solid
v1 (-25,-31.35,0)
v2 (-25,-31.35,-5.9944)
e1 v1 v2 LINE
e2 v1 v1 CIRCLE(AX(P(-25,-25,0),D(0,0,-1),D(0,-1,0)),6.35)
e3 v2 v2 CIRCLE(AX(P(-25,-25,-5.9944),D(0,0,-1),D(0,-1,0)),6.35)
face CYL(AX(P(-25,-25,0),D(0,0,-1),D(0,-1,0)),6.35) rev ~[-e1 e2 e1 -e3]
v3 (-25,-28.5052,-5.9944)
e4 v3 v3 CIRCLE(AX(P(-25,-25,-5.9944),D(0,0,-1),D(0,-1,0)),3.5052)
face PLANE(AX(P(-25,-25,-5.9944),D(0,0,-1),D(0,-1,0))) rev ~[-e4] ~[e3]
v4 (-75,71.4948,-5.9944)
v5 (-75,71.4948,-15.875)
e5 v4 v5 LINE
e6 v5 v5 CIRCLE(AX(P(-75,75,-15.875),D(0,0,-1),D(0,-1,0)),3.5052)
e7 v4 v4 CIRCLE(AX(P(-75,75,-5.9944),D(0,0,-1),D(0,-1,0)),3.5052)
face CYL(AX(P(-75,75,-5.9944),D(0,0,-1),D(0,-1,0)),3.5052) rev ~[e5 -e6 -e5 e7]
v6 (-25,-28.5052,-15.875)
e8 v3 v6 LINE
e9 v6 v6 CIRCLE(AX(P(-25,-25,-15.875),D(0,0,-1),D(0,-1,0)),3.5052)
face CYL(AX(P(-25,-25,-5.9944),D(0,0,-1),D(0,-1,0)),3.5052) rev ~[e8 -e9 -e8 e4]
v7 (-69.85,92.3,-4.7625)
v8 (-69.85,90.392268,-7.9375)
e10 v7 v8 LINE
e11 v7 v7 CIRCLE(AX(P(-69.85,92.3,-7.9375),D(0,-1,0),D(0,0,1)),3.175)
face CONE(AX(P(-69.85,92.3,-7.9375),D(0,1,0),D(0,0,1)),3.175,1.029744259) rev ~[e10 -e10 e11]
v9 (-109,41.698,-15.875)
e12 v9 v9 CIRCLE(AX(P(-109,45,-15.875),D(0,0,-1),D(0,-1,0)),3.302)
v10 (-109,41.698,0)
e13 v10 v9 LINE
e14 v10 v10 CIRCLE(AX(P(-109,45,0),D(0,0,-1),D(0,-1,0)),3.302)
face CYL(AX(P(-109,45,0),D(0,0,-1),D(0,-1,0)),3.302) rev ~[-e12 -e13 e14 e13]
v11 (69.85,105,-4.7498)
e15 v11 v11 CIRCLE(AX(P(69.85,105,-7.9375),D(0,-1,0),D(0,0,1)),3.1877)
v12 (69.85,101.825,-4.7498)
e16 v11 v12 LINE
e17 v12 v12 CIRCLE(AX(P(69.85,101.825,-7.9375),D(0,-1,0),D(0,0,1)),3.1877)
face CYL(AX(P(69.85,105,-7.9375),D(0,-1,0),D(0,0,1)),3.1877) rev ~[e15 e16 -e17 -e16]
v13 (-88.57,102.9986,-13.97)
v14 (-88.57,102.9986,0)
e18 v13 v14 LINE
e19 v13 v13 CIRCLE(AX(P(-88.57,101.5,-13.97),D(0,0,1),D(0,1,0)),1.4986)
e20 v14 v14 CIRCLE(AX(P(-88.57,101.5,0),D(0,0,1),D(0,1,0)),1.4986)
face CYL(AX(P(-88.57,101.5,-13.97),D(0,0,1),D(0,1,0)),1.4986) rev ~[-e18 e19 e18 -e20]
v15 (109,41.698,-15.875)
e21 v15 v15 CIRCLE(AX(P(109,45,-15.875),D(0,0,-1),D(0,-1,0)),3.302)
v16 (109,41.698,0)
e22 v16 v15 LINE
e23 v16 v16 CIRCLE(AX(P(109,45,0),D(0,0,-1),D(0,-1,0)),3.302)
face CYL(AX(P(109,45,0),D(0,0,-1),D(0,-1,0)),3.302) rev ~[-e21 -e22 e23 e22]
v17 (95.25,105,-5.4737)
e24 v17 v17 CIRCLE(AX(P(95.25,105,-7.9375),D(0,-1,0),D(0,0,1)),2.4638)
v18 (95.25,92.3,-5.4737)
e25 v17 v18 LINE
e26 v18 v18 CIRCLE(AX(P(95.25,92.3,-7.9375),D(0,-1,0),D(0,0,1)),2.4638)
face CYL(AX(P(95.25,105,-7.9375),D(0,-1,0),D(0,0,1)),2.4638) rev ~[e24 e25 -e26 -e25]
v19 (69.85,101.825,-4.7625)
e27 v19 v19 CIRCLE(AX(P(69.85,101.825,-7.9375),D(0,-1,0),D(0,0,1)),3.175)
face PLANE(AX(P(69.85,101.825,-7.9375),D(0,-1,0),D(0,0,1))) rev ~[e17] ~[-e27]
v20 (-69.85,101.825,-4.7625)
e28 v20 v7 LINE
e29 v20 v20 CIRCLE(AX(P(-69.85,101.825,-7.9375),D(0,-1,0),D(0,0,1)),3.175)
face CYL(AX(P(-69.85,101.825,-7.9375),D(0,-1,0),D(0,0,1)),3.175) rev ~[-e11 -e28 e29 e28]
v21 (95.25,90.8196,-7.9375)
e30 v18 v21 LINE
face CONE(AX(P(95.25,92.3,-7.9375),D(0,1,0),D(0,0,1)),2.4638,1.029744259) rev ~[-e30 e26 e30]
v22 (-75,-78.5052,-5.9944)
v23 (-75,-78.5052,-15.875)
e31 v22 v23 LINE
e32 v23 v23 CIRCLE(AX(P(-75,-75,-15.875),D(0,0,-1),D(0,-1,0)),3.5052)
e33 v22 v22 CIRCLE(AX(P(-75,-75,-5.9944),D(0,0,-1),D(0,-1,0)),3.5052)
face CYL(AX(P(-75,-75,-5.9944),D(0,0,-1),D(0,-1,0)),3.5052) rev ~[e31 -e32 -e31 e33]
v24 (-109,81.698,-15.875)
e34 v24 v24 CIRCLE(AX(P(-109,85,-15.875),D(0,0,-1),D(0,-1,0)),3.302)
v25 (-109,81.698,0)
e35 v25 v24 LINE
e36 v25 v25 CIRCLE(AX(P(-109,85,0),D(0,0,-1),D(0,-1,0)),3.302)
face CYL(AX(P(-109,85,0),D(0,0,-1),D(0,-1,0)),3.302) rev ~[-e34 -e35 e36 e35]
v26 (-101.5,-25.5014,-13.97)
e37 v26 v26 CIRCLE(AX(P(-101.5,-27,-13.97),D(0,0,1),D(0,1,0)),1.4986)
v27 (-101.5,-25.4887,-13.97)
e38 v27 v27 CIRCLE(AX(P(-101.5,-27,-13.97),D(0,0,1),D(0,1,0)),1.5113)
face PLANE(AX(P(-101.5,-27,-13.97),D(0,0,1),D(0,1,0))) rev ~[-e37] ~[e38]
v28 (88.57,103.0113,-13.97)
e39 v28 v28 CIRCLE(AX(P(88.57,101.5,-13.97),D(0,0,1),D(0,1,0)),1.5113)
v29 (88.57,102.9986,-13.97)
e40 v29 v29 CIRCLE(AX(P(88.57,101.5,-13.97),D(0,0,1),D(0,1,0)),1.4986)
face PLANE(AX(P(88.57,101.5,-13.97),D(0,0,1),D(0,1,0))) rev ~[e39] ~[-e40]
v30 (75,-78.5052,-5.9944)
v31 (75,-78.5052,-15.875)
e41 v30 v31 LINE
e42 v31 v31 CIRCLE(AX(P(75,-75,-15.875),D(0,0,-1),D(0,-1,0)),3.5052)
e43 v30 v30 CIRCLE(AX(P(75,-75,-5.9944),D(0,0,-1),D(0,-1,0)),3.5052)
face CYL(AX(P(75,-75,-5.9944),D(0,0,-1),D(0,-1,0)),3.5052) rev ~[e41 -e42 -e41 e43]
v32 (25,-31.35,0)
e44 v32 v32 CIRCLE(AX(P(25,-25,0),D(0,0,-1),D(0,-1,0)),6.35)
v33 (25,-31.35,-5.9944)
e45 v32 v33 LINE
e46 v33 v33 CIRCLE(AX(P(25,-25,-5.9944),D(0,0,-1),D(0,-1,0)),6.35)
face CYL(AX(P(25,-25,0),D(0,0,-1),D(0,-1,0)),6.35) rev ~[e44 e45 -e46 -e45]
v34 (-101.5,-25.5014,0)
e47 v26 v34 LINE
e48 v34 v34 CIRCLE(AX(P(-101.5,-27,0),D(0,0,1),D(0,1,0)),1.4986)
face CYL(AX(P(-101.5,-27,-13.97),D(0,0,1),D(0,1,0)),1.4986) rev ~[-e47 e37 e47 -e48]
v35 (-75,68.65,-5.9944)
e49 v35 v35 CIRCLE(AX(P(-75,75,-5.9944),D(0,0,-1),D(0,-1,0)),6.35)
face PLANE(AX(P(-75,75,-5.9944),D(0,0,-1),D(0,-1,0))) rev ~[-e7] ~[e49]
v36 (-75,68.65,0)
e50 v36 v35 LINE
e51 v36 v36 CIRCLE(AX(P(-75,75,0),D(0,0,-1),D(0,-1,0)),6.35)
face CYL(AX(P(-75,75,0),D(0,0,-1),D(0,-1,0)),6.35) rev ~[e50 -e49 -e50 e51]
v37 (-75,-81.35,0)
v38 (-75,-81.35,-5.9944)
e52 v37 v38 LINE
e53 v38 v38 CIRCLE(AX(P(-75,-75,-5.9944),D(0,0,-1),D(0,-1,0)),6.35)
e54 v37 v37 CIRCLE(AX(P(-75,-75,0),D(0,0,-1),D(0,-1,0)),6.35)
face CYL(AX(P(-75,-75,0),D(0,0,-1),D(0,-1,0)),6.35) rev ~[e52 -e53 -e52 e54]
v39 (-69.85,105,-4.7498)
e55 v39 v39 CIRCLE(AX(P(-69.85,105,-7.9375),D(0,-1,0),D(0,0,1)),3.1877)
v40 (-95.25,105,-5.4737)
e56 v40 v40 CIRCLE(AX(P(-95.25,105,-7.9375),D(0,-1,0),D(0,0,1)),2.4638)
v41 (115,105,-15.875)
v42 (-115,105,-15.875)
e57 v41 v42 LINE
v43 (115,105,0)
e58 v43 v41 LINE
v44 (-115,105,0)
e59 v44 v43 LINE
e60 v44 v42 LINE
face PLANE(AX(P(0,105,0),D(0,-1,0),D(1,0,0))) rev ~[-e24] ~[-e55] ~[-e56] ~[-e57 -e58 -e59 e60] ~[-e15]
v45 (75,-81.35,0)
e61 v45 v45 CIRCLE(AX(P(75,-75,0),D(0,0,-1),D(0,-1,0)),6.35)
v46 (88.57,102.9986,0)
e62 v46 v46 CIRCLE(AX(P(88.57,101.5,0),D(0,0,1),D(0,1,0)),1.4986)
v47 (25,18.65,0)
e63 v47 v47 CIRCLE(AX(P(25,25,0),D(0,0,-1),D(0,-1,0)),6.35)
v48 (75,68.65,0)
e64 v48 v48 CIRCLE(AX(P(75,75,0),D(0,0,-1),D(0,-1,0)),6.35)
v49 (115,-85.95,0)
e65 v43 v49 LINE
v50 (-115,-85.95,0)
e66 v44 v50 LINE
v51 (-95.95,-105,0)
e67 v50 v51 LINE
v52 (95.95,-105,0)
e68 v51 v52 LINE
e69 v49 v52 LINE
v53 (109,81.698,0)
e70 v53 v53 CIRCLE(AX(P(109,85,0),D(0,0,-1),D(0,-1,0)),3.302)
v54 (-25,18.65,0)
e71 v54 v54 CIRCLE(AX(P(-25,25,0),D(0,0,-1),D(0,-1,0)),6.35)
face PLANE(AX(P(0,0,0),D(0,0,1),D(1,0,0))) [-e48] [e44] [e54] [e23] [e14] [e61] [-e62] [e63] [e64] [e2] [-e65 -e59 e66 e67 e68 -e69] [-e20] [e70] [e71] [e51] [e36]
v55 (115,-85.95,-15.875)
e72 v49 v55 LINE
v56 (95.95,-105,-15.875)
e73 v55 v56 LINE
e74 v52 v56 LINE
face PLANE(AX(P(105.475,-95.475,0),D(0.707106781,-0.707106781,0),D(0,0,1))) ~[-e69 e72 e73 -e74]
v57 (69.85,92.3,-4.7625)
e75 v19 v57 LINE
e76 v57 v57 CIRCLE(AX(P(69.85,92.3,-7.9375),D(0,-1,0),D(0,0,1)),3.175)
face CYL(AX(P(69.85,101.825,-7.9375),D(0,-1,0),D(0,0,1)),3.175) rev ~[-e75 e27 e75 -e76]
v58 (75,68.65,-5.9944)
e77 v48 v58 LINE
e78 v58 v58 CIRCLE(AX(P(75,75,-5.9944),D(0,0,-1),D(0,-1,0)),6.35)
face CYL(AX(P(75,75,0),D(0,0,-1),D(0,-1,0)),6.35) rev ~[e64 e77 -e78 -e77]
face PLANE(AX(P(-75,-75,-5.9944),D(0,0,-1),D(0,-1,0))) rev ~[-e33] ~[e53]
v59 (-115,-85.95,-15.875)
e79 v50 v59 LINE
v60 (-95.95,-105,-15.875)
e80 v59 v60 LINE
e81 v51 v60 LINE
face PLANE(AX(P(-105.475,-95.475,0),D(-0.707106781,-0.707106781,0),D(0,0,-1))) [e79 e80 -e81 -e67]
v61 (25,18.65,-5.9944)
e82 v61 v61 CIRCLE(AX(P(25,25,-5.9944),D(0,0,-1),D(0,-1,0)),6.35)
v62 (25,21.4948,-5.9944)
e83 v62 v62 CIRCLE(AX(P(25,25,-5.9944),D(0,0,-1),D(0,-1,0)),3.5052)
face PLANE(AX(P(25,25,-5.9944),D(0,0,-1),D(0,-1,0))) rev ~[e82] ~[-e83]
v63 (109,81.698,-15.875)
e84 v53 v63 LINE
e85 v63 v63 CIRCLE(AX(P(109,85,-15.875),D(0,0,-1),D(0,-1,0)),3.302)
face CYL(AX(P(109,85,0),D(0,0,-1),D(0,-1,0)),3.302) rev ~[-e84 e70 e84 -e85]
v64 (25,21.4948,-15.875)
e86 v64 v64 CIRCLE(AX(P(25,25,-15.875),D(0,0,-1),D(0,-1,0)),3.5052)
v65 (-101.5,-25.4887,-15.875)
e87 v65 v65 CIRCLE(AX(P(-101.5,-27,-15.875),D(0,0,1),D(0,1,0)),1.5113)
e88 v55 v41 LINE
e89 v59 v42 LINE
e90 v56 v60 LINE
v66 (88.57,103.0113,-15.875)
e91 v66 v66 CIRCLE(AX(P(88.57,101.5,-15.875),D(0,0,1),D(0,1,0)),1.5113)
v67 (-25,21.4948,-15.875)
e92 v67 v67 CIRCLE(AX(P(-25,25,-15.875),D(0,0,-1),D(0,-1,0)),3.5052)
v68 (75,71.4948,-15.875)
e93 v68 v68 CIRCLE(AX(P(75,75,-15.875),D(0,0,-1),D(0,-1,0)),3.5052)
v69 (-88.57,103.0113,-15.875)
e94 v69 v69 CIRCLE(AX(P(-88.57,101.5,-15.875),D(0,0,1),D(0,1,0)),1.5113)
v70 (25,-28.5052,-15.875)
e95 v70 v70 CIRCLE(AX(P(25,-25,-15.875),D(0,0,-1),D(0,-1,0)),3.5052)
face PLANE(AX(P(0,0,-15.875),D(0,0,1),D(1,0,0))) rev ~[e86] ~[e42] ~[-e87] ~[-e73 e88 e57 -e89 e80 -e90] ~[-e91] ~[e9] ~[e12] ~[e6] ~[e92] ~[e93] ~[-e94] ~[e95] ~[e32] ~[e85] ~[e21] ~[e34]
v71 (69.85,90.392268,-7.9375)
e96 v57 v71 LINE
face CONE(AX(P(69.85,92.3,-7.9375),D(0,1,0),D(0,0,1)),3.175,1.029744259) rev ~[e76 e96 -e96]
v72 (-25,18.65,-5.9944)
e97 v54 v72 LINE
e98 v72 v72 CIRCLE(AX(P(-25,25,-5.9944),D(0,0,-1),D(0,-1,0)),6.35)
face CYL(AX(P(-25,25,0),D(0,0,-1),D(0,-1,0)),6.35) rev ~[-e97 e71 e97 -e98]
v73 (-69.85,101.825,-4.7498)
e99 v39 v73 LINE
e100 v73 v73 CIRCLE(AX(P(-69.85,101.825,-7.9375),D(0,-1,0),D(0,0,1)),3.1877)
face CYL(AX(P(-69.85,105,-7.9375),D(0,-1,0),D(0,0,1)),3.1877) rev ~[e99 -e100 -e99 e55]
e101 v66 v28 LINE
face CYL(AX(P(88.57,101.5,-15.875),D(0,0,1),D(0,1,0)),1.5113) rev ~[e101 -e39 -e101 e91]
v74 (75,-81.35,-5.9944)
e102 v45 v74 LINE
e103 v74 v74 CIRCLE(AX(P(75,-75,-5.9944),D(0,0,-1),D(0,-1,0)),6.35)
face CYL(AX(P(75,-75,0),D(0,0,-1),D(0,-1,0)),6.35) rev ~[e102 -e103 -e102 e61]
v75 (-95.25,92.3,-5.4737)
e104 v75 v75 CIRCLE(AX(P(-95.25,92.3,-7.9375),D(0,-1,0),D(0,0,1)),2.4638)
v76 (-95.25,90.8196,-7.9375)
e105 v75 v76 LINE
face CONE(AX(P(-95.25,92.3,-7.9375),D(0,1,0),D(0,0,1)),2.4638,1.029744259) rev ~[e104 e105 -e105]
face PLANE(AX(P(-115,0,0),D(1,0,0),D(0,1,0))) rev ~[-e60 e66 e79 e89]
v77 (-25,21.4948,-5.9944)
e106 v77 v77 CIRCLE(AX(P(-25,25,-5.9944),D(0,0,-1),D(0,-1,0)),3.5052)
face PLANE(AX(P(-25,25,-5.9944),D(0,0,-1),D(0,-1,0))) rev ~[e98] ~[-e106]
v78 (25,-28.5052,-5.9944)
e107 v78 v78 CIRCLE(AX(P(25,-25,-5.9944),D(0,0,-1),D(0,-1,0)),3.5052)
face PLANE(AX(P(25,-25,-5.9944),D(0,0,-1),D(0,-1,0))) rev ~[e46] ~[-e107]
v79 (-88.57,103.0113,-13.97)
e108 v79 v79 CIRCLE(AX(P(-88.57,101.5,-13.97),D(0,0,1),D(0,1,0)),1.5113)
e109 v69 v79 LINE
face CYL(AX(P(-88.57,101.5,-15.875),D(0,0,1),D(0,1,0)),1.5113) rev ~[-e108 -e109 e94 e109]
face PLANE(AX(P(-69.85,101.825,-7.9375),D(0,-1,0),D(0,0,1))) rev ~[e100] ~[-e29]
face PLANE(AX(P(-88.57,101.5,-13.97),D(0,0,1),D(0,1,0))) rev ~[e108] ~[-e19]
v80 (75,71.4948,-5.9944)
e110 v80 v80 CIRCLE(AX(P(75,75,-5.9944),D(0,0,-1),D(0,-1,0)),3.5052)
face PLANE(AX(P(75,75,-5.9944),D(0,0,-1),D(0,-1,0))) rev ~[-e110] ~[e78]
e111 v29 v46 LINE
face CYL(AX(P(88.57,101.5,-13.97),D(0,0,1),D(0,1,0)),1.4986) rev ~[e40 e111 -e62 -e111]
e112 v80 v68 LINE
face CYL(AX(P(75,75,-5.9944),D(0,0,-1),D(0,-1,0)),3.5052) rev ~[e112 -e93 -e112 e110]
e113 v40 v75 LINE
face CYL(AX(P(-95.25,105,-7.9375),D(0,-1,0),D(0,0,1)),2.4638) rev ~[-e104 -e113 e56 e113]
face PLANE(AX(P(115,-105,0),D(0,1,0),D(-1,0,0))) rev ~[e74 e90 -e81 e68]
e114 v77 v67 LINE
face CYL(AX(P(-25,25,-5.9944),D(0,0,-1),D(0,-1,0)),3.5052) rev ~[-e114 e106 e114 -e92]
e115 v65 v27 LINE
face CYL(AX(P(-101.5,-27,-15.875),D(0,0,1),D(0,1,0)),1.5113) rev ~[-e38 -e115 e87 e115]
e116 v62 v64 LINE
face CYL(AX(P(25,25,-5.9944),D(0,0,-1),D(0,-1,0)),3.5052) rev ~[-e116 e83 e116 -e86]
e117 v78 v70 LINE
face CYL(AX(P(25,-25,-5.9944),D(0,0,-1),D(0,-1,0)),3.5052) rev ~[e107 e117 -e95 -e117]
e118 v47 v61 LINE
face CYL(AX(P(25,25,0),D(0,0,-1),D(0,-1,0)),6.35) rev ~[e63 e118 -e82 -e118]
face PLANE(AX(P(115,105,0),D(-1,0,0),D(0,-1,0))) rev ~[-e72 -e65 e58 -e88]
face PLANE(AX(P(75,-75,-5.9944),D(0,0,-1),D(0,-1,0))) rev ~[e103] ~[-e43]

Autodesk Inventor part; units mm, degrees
ref_plane "YZ Plane" through (0, 0, 0) normal (1, 0, 0) x (0, 1, 0)
ref_plane "XZ Plane" through (0, 0, 0) normal (0, 1, 0) x (-1, 0, 0)
ref_plane "XY Plane" through (0, 0, 0) normal (0, 0, 1) x (1, 0, 0)
sketch "Sketch1" plane through (0, 0, 0) normal (0, 0, 1) x (1, 0, 0)
  line L0 (0, 147) -> (0, -147) projected
  line L1 (-161, 0) -> (161, 0) projected
  line L2 (115, -105) -> (-115, -105)
  line L3 (-115, -105) -> (-115, 105)
  line L4 (-115, 105) -> (115, 105)
  line L5 (115, 105) -> (115, -105)
  line L6 (115, -105) -> (-115, 105) construction
  line L7 (-115, -105) -> (115, 105) construction
  line L8 (75, -75) -> (-75, -75) construction
  line L9 (-75, -75) -> (-75, 75) construction
  line L10 (-75, 75) -> (75, 75) construction
  line L11 (75, 75) -> (75, -75) construction
  line L12 (75, -75) -> (-75, 75) construction
  line L13 (-75, -75) -> (75, 75) construction
  line L14 (25, -25) -> (-25, -25) construction
  line L15 (-25, -25) -> (-25, 25) construction
  line L16 (-25, 25) -> (25, 25) construction
  line L17 (25, 25) -> (25, -25) construction
  line L18 (25, -25) -> (-25, 25) construction
  line L19 (-25, -25) -> (25, 25) construction
  point P0 (0, 0)
  dimension "d0" = 230
  dimension "d1" = 210
  dimension "d2" = 150
  dimension "d3" = 150
  dimension "d4" = 50
  dimension "d5" = 50
extrude "Extrusion1" add sketch "Sketch1" against normal blind 15.875
hole "Hole1" at (-75, 75, 0) at (75, 75, 0) at (75, -75, 0) at (-75, -75, 0) at (-25, 25, 0) at (25, 25, 0) at (25, -25, 0) at (-25, -25, 0) direction (0, 0, -1) diameter 7.0104 end through all counterbore diameter 12.7 counterbore depth 5.9944 clearance for "Socket Head Cap Screw" size "M6" standard "Ansi Metric M Profile"
sketch "Sketch2" plane through (0, 0, -15.875) normal (0, 0, -1) x (-1, 0, 0)
  line L0 (0, -147) -> (0, 147) projected
  line L1 (-161, 0) -> (161, 0) projected
  line L2 (100, -100) -> (-100, -100) construction
  line L3 (-100, -100) -> (-100, 100) construction
  line L4 (-100, 100) -> (100, 100) construction
  line L5 (100, 100) -> (100, -100) construction
  line L6 (100, -100) -> (-100, 100) construction
  line L7 (-100, -100) -> (100, 100) construction
  circle A0 centre (101.5, -27) radius 1.5 construction
  circle A1 centre (88.57, 101.5) radius 1.5 construction
  circle A2 centre (-88.57, 101.5) radius 1.5 construction
  point P0 (0, 0)
  dimension "d15" = 200
  dimension "d16" = 200
  dimension "d17" = 3
  dimension "d18" = 127
  dimension "d19" = 11.43
  dimension "d20" = 11.43
hole "Hole2" at (-101.5, -27, -15.875) at (-88.57, 101.5, -15.875) at (88.57, 101.5, -15.875) direction (0, 0, 1) diameter 2.9972 end through all counterbore diameter 3.0226 counterbore depth 1.905
chamfer "Chamfer1" distance 19.05 angle 45 2 edges at (-115, -105, -7.9375) (115, -105, -7.9375)
sketch "Sketch3" plane through (-115, 105, 0) normal (0, 1, 0) x (1, 0, 0)
  line L0 (115, 19.05) -> (115, -3.175) projected
  line L1 (276, 0) -> (-46, 0) projected
  line L2 (19.75, 7.9375) -> (210.25, 7.9375) construction
  line L3 (0, 15.875) -> (230, 15.875) projected
  point P0 (115, 0)
  point P1 (45.15, 7.9375)
  point P2 (184.85, 7.9375)
  dimension "d31" = 95.25
  dimension "d32" = 95.25
  dimension "d33" = 69.85
  dimension "d34" = 69.85
  dimension "d49" = 7.9375
  dimension "d50" = 15.875
hole "Hole3" at (95.25, 105, -7.9375) at (-95.25, 105, -7.9375) direction (0, -1, 0) diameter 4.9276 depth 12.7 tip angle 118
hole "Hole4" at (69.85, 105, -7.9375) at (-69.85, 105, -7.9375) direction (0, -1, 0) diameter 6.35 depth 12.7 tip angle 118 counterbore diameter 6.3754 counterbore depth 3.175
sketch "Sketch4" plane through (0, 0, 0) normal (0, 0, 1) x (1, 0, 0)
  line L0 (0, 147) -> (0, -147) projected
  line L1 (-161, 0) -> (161, 0) projected
  line L2 (-115, -85.95) -> (-115, 105) projected
  line L3 (115, 105) -> (115, -85.95) projected
  line L4 (109, 45) -> (-109, 45) construction
  line L5 (-109, 45) -> (-109, 85) construction
  line L6 (-109, 85) -> (109, 85) construction
  line L7 (109, 85) -> (109, 45) construction
  line L8 (109, 45) -> (-109, 85) construction
  line L9 (-109, 45) -> (109, 85) construction
  line L10 (-115, 105) -> (115, 105) construction
  point P0 (0, 0)
  point P1 (0, 65)
  dimension "d51" = 6
  dimension "d52" = 20
  dimension "d53" = 40
hole "Hole5" at (-109, 85, 0) at (-109, 45, 0) at (109, 45, 0) at (109, 85, 0) direction (0, 0, -1) diameter 6.604 end through all clearance for "Socket Head Cap Screw" size "M6" standard "Ansi Metric M Profile"
equation "\"d32\" = d31"
equation "\"d34\" = d33"
equation "\"d49\" = 0.5 * d50"
properties part number "J008085" material "ALUMINUM, 6061-T651"
